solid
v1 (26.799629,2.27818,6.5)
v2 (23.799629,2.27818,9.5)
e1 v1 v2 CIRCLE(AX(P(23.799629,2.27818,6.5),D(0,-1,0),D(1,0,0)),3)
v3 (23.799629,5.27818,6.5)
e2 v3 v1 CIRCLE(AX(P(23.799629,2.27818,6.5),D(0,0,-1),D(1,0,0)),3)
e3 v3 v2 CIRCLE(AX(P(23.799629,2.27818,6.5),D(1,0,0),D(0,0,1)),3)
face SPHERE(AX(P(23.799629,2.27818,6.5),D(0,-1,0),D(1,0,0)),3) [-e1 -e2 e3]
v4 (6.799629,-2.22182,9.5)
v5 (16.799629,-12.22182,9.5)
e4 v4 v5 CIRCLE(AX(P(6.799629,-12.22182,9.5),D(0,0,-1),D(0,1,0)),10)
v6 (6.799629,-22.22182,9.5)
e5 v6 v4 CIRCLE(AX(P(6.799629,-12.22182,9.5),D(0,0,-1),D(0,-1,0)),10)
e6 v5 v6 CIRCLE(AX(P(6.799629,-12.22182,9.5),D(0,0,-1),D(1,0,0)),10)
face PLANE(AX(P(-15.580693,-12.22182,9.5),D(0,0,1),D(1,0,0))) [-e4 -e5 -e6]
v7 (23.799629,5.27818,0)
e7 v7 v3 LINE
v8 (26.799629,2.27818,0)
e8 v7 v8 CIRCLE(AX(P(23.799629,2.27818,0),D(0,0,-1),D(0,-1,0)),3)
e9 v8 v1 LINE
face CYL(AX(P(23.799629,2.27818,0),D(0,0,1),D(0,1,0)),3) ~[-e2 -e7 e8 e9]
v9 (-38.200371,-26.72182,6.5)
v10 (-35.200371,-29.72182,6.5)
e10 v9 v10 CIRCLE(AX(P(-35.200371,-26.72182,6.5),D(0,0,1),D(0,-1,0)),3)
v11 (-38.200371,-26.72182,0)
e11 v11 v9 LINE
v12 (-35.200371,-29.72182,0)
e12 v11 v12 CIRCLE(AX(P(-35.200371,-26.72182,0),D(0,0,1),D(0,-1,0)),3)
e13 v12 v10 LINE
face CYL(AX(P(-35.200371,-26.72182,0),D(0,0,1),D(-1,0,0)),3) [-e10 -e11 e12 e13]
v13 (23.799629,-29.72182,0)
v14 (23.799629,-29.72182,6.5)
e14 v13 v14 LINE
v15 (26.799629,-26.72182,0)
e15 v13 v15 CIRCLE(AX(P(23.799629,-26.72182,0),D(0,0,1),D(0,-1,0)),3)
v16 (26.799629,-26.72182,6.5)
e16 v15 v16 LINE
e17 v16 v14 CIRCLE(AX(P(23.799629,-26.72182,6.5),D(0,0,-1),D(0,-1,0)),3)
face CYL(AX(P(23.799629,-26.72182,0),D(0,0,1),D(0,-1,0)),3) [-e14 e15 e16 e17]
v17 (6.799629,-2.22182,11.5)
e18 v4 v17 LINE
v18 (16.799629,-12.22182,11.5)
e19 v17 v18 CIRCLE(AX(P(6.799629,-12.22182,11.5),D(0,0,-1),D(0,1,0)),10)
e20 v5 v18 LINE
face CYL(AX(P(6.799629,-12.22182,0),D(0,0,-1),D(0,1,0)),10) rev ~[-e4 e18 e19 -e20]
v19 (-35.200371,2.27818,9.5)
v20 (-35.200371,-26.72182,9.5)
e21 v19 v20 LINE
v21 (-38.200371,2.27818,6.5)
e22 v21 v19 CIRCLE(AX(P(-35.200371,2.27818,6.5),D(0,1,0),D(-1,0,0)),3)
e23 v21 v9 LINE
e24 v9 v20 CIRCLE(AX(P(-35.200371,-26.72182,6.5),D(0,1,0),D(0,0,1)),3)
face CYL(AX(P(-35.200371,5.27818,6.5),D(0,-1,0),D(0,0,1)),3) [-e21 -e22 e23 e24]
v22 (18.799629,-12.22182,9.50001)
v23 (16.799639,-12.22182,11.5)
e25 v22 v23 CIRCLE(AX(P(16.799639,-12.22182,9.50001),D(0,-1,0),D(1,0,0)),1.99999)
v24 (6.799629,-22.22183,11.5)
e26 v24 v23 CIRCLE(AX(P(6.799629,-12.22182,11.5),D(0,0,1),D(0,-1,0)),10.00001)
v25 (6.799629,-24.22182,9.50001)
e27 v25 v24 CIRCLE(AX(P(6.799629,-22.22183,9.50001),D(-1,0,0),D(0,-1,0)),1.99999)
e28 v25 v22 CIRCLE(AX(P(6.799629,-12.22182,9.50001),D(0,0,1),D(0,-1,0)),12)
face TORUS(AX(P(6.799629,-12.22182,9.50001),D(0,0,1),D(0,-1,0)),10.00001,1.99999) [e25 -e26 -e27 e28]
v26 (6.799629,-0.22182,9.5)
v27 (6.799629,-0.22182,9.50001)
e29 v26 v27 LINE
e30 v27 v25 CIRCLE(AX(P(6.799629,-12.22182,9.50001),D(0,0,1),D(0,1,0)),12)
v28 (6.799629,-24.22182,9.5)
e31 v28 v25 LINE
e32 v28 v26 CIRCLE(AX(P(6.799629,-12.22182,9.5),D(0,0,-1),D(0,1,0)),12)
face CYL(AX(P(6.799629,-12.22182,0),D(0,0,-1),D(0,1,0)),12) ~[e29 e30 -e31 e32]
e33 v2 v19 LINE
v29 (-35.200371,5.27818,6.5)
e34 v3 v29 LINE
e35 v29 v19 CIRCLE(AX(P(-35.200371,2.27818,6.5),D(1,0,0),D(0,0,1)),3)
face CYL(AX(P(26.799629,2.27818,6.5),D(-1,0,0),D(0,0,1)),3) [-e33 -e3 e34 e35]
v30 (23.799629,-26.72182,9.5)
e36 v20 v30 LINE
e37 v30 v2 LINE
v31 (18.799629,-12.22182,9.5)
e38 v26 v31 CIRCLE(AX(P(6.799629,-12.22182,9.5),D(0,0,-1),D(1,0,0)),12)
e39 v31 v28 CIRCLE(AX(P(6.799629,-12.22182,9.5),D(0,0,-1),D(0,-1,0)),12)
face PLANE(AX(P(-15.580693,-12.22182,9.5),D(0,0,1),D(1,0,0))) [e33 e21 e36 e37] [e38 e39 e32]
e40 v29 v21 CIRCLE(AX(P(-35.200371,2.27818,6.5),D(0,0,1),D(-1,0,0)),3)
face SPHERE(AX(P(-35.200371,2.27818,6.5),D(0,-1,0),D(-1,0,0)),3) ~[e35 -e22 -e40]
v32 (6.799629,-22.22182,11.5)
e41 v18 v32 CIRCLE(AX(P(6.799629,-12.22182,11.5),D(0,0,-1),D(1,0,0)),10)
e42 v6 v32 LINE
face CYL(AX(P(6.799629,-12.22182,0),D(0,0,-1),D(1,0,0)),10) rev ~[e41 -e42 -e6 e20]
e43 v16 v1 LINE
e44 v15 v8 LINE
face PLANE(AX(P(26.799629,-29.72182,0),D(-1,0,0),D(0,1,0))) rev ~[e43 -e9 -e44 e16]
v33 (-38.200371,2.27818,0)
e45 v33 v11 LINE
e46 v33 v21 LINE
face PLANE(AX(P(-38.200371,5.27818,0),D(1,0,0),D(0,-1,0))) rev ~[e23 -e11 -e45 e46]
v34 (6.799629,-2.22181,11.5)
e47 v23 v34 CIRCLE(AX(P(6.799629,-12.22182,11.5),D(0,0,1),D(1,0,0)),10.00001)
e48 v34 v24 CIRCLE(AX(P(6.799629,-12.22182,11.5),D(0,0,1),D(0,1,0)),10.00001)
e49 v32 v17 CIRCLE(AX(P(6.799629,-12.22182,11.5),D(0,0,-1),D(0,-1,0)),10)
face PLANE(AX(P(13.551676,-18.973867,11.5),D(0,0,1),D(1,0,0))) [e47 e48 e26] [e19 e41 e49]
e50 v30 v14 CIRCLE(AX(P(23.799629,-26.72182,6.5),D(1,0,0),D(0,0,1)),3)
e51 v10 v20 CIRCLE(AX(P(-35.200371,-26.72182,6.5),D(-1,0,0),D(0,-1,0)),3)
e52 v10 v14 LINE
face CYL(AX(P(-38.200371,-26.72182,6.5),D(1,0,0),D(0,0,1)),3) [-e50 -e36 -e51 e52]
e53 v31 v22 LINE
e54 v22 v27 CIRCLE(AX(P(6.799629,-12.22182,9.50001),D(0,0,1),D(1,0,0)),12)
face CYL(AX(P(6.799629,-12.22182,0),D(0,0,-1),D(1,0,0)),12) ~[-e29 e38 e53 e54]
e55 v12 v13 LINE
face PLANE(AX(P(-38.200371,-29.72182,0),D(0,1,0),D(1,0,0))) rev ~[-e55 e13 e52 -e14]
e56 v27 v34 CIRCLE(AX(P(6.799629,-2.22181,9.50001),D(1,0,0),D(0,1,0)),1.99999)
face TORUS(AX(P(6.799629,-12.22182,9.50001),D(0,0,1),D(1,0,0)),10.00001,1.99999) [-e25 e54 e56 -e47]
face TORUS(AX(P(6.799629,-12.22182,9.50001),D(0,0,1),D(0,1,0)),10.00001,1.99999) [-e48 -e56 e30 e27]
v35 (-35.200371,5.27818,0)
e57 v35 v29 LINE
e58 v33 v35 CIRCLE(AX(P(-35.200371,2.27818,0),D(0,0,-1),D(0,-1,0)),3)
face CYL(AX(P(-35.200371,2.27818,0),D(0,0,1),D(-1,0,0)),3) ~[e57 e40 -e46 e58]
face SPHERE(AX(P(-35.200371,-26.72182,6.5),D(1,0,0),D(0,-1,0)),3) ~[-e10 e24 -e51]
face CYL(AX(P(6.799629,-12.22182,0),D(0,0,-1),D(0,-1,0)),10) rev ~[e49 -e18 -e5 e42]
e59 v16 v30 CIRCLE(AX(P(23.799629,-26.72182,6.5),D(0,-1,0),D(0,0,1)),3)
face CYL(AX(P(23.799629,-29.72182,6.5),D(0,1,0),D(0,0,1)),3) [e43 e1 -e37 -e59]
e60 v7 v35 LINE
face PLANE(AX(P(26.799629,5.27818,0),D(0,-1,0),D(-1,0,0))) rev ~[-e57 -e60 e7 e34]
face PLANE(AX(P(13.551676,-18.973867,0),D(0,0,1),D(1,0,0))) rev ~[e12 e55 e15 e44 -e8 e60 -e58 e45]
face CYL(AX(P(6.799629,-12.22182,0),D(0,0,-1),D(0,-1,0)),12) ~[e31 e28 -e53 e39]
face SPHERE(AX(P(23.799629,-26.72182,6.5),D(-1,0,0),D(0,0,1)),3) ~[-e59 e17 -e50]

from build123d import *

# Parameters (mm, degrees)
F1_DEPTH = 9.5
F2_DEPTH = 11.5
F3_R     = 1.99999
F4_R     = 3


# Not quite as in the source:
# - a fillet or chamfer is up to 0.001 mm smaller than in the source, because OpenCascade refuses the exact size


with BuildPart() as f1:
    # F0 (on Top) → F1 (new body)
    with BuildSketch(Plane.XY):
        with BuildLine():
            Line((6.7996287718, 5.2781800885), (-38.2003712282, 5.2781800885))
            Line((-38.2003712282, 5.2781800885), (-38.2003712282, -29.7218199115))
            Line((-38.2003712282, -29.7218199115), (6.7996287718, -29.7218199115))
            Line((6.7996287718, -29.7218199115), (6.7996287718, -24.2218199115))
            ThreePointArc((6.7996287718, -24.2218199115), (-5.2003712282, -12.2218199115), (6.7996287718, -0.2218199115))
            Line((6.7996287718, -0.2218199115), (6.7996287718, 5.2781800885))
        make_face()
        with BuildLine():
            Line((26.7996287718, 5.2781800885), (6.7996287718, 5.2781800885))
            Line((6.7996287718, 5.2781800885), (6.7996287718, -0.2218199115))
            ThreePointArc((6.7996287718, -0.2218199115), (15.2849101461, -3.7365385373), (18.7996287718, -12.2218199115))
            Line((18.7996287718, -12.2218199115), (26.7996287718, -12.2218199115))
            Line((26.7996287718, -12.2218199115), (26.7996287718, 5.2781800885))
        make_face()
        with BuildLine():
            Line((6.7996287718, -24.2218199115), (6.7996287718, -29.7218199115))
            Line((6.7996287718, -29.7218199115), (26.7996287718, -29.7218199115))
            Line((26.7996287718, -29.7218199115), (26.7996287718, -12.2218199115))
            Line((26.7996287718, -12.2218199115), (18.7996287718, -12.2218199115))
            ThreePointArc((18.7996287718, -12.2218199115), (15.2849101461, -20.7071012858), (6.7996287718, -24.2218199115))
        make_face()
        with BuildLine():
            ThreePointArc((6.7996287718, -24.2218199115), (15.2849101461, -20.7071012858), (18.7996287718, -12.2218199115))
            Line((18.7996287718, -12.2218199115), (16.7996287718, -12.2218199115))
            ThreePointArc((16.7996287718, -12.2218199115), (13.8706965837, -19.2928877234), (6.7996287718, -22.2218199115))
            Line((6.7996287718, -22.2218199115), (6.7996287718, -24.2218199115))
        make_face()
        with BuildLine():
            ThreePointArc((18.7996287718, -12.2218199115), (15.2849101461, -3.7365385373), (6.7996287718, -0.2218199115))
            Line((6.7996287718, -0.2218199115), (6.7996287718, -2.2218199115))
            ThreePointArc((6.7996287718, -2.2218199115), (13.8706965837, -5.1507520997), (16.7996287718, -12.2218199115))
            Line((16.7996287718, -12.2218199115), (18.7996287718, -12.2218199115))
        make_face()
        with BuildLine():
            Line((6.7996287718, -2.2218199115), (6.7996287718, -0.2218199115))
            ThreePointArc((6.7996287718, -0.2218199115), (-5.2003712282, -12.2218199115), (6.7996287718, -24.2218199115))
            Line((6.7996287718, -24.2218199115), (6.7996287718, -22.2218199115))
            ThreePointArc((6.7996287718, -22.2218199115), (-3.2003712282, -12.2218199115), (6.7996287718, -2.2218199115))
        make_face()
        with BuildLine():
            Line((6.7996287718, -22.2218199115), (6.7996287718, -2.2218199115))
            ThreePointArc((6.7996287718, -2.2218199115), (-3.2003712282, -12.2218199115), (6.7996287718, -22.2218199115))
        make_face()
        with BuildLine():
            ThreePointArc((16.7996287718, -12.2218199115), (13.8706965837, -5.1507520997), (6.7996287718, -2.2218199115))
            Line((6.7996287718, -2.2218199115), (6.7996287718, -22.2218199115))
            ThreePointArc((6.7996287718, -22.2218199115), (13.8706965837, -19.2928877234), (16.7996287718, -12.2218199115))
        make_face()
    extrude(amount=F1_DEPTH)

    # F0 (on Top) → F2 (join)
    with BuildSketch(Plane.XY):
        with BuildLine():
            ThreePointArc((6.7996287718, -24.2218199115), (15.2849101461, -20.7071012858), (18.7996287718, -12.2218199115))
            Line((18.7996287718, -12.2218199115), (16.7996287718, -12.2218199115))
            ThreePointArc((16.7996287718, -12.2218199115), (13.8706965837, -19.2928877234), (6.7996287718, -22.2218199115))
            Line((6.7996287718, -22.2218199115), (6.7996287718, -24.2218199115))
        make_face()
        with BuildLine():
            ThreePointArc((18.7996287718, -12.2218199115), (15.2849101461, -3.7365385373), (6.7996287718, -0.2218199115))
            Line((6.7996287718, -0.2218199115), (6.7996287718, -2.2218199115))
            ThreePointArc((6.7996287718, -2.2218199115), (13.8706965837, -5.1507520997), (16.7996287718, -12.2218199115))
            Line((16.7996287718, -12.2218199115), (18.7996287718, -12.2218199115))
        make_face()
        with BuildLine():
            Line((6.7996287718, -2.2218199115), (6.7996287718, -0.2218199115))
            ThreePointArc((6.7996287718, -0.2218199115), (-5.2003712282, -12.2218199115), (6.7996287718, -24.2218199115))
            Line((6.7996287718, -24.2218199115), (6.7996287718, -22.2218199115))
            ThreePointArc((6.7996287718, -22.2218199115), (-3.2003712282, -12.2218199115), (6.7996287718, -2.2218199115))
        make_face()
    extrude(amount=F2_DEPTH)

    # F3 (radius 2 in the source; OpenCascade refuses exactly that, so slightly less here)
    f3_edges = [f1.edges().sort_by_distance(p)[0] for p in [
        (6.799629, -24.22182, 11.5),
    ]]
    fillet(f3_edges, radius=F3_R)

    # F4
    f4_edges = [f1.edges().sort_by_distance(p)[0] for p in [
        (-5.700371, -29.72182, 9.5),
        (26.799629, -12.22182, 9.5),
        (26.799629, -29.72182, 4.75),
        (-38.200371, -29.72182, 4.75),
        (-38.200371, -12.22182, 9.5),
        (-38.200371, 5.27818, 4.75),
        (26.799629, 5.27818, 4.75),
        (-5.700371, 5.27818, 9.5),
    ]]
    fillet(f4_edges, radius=F4_R)


solid = f1.part
